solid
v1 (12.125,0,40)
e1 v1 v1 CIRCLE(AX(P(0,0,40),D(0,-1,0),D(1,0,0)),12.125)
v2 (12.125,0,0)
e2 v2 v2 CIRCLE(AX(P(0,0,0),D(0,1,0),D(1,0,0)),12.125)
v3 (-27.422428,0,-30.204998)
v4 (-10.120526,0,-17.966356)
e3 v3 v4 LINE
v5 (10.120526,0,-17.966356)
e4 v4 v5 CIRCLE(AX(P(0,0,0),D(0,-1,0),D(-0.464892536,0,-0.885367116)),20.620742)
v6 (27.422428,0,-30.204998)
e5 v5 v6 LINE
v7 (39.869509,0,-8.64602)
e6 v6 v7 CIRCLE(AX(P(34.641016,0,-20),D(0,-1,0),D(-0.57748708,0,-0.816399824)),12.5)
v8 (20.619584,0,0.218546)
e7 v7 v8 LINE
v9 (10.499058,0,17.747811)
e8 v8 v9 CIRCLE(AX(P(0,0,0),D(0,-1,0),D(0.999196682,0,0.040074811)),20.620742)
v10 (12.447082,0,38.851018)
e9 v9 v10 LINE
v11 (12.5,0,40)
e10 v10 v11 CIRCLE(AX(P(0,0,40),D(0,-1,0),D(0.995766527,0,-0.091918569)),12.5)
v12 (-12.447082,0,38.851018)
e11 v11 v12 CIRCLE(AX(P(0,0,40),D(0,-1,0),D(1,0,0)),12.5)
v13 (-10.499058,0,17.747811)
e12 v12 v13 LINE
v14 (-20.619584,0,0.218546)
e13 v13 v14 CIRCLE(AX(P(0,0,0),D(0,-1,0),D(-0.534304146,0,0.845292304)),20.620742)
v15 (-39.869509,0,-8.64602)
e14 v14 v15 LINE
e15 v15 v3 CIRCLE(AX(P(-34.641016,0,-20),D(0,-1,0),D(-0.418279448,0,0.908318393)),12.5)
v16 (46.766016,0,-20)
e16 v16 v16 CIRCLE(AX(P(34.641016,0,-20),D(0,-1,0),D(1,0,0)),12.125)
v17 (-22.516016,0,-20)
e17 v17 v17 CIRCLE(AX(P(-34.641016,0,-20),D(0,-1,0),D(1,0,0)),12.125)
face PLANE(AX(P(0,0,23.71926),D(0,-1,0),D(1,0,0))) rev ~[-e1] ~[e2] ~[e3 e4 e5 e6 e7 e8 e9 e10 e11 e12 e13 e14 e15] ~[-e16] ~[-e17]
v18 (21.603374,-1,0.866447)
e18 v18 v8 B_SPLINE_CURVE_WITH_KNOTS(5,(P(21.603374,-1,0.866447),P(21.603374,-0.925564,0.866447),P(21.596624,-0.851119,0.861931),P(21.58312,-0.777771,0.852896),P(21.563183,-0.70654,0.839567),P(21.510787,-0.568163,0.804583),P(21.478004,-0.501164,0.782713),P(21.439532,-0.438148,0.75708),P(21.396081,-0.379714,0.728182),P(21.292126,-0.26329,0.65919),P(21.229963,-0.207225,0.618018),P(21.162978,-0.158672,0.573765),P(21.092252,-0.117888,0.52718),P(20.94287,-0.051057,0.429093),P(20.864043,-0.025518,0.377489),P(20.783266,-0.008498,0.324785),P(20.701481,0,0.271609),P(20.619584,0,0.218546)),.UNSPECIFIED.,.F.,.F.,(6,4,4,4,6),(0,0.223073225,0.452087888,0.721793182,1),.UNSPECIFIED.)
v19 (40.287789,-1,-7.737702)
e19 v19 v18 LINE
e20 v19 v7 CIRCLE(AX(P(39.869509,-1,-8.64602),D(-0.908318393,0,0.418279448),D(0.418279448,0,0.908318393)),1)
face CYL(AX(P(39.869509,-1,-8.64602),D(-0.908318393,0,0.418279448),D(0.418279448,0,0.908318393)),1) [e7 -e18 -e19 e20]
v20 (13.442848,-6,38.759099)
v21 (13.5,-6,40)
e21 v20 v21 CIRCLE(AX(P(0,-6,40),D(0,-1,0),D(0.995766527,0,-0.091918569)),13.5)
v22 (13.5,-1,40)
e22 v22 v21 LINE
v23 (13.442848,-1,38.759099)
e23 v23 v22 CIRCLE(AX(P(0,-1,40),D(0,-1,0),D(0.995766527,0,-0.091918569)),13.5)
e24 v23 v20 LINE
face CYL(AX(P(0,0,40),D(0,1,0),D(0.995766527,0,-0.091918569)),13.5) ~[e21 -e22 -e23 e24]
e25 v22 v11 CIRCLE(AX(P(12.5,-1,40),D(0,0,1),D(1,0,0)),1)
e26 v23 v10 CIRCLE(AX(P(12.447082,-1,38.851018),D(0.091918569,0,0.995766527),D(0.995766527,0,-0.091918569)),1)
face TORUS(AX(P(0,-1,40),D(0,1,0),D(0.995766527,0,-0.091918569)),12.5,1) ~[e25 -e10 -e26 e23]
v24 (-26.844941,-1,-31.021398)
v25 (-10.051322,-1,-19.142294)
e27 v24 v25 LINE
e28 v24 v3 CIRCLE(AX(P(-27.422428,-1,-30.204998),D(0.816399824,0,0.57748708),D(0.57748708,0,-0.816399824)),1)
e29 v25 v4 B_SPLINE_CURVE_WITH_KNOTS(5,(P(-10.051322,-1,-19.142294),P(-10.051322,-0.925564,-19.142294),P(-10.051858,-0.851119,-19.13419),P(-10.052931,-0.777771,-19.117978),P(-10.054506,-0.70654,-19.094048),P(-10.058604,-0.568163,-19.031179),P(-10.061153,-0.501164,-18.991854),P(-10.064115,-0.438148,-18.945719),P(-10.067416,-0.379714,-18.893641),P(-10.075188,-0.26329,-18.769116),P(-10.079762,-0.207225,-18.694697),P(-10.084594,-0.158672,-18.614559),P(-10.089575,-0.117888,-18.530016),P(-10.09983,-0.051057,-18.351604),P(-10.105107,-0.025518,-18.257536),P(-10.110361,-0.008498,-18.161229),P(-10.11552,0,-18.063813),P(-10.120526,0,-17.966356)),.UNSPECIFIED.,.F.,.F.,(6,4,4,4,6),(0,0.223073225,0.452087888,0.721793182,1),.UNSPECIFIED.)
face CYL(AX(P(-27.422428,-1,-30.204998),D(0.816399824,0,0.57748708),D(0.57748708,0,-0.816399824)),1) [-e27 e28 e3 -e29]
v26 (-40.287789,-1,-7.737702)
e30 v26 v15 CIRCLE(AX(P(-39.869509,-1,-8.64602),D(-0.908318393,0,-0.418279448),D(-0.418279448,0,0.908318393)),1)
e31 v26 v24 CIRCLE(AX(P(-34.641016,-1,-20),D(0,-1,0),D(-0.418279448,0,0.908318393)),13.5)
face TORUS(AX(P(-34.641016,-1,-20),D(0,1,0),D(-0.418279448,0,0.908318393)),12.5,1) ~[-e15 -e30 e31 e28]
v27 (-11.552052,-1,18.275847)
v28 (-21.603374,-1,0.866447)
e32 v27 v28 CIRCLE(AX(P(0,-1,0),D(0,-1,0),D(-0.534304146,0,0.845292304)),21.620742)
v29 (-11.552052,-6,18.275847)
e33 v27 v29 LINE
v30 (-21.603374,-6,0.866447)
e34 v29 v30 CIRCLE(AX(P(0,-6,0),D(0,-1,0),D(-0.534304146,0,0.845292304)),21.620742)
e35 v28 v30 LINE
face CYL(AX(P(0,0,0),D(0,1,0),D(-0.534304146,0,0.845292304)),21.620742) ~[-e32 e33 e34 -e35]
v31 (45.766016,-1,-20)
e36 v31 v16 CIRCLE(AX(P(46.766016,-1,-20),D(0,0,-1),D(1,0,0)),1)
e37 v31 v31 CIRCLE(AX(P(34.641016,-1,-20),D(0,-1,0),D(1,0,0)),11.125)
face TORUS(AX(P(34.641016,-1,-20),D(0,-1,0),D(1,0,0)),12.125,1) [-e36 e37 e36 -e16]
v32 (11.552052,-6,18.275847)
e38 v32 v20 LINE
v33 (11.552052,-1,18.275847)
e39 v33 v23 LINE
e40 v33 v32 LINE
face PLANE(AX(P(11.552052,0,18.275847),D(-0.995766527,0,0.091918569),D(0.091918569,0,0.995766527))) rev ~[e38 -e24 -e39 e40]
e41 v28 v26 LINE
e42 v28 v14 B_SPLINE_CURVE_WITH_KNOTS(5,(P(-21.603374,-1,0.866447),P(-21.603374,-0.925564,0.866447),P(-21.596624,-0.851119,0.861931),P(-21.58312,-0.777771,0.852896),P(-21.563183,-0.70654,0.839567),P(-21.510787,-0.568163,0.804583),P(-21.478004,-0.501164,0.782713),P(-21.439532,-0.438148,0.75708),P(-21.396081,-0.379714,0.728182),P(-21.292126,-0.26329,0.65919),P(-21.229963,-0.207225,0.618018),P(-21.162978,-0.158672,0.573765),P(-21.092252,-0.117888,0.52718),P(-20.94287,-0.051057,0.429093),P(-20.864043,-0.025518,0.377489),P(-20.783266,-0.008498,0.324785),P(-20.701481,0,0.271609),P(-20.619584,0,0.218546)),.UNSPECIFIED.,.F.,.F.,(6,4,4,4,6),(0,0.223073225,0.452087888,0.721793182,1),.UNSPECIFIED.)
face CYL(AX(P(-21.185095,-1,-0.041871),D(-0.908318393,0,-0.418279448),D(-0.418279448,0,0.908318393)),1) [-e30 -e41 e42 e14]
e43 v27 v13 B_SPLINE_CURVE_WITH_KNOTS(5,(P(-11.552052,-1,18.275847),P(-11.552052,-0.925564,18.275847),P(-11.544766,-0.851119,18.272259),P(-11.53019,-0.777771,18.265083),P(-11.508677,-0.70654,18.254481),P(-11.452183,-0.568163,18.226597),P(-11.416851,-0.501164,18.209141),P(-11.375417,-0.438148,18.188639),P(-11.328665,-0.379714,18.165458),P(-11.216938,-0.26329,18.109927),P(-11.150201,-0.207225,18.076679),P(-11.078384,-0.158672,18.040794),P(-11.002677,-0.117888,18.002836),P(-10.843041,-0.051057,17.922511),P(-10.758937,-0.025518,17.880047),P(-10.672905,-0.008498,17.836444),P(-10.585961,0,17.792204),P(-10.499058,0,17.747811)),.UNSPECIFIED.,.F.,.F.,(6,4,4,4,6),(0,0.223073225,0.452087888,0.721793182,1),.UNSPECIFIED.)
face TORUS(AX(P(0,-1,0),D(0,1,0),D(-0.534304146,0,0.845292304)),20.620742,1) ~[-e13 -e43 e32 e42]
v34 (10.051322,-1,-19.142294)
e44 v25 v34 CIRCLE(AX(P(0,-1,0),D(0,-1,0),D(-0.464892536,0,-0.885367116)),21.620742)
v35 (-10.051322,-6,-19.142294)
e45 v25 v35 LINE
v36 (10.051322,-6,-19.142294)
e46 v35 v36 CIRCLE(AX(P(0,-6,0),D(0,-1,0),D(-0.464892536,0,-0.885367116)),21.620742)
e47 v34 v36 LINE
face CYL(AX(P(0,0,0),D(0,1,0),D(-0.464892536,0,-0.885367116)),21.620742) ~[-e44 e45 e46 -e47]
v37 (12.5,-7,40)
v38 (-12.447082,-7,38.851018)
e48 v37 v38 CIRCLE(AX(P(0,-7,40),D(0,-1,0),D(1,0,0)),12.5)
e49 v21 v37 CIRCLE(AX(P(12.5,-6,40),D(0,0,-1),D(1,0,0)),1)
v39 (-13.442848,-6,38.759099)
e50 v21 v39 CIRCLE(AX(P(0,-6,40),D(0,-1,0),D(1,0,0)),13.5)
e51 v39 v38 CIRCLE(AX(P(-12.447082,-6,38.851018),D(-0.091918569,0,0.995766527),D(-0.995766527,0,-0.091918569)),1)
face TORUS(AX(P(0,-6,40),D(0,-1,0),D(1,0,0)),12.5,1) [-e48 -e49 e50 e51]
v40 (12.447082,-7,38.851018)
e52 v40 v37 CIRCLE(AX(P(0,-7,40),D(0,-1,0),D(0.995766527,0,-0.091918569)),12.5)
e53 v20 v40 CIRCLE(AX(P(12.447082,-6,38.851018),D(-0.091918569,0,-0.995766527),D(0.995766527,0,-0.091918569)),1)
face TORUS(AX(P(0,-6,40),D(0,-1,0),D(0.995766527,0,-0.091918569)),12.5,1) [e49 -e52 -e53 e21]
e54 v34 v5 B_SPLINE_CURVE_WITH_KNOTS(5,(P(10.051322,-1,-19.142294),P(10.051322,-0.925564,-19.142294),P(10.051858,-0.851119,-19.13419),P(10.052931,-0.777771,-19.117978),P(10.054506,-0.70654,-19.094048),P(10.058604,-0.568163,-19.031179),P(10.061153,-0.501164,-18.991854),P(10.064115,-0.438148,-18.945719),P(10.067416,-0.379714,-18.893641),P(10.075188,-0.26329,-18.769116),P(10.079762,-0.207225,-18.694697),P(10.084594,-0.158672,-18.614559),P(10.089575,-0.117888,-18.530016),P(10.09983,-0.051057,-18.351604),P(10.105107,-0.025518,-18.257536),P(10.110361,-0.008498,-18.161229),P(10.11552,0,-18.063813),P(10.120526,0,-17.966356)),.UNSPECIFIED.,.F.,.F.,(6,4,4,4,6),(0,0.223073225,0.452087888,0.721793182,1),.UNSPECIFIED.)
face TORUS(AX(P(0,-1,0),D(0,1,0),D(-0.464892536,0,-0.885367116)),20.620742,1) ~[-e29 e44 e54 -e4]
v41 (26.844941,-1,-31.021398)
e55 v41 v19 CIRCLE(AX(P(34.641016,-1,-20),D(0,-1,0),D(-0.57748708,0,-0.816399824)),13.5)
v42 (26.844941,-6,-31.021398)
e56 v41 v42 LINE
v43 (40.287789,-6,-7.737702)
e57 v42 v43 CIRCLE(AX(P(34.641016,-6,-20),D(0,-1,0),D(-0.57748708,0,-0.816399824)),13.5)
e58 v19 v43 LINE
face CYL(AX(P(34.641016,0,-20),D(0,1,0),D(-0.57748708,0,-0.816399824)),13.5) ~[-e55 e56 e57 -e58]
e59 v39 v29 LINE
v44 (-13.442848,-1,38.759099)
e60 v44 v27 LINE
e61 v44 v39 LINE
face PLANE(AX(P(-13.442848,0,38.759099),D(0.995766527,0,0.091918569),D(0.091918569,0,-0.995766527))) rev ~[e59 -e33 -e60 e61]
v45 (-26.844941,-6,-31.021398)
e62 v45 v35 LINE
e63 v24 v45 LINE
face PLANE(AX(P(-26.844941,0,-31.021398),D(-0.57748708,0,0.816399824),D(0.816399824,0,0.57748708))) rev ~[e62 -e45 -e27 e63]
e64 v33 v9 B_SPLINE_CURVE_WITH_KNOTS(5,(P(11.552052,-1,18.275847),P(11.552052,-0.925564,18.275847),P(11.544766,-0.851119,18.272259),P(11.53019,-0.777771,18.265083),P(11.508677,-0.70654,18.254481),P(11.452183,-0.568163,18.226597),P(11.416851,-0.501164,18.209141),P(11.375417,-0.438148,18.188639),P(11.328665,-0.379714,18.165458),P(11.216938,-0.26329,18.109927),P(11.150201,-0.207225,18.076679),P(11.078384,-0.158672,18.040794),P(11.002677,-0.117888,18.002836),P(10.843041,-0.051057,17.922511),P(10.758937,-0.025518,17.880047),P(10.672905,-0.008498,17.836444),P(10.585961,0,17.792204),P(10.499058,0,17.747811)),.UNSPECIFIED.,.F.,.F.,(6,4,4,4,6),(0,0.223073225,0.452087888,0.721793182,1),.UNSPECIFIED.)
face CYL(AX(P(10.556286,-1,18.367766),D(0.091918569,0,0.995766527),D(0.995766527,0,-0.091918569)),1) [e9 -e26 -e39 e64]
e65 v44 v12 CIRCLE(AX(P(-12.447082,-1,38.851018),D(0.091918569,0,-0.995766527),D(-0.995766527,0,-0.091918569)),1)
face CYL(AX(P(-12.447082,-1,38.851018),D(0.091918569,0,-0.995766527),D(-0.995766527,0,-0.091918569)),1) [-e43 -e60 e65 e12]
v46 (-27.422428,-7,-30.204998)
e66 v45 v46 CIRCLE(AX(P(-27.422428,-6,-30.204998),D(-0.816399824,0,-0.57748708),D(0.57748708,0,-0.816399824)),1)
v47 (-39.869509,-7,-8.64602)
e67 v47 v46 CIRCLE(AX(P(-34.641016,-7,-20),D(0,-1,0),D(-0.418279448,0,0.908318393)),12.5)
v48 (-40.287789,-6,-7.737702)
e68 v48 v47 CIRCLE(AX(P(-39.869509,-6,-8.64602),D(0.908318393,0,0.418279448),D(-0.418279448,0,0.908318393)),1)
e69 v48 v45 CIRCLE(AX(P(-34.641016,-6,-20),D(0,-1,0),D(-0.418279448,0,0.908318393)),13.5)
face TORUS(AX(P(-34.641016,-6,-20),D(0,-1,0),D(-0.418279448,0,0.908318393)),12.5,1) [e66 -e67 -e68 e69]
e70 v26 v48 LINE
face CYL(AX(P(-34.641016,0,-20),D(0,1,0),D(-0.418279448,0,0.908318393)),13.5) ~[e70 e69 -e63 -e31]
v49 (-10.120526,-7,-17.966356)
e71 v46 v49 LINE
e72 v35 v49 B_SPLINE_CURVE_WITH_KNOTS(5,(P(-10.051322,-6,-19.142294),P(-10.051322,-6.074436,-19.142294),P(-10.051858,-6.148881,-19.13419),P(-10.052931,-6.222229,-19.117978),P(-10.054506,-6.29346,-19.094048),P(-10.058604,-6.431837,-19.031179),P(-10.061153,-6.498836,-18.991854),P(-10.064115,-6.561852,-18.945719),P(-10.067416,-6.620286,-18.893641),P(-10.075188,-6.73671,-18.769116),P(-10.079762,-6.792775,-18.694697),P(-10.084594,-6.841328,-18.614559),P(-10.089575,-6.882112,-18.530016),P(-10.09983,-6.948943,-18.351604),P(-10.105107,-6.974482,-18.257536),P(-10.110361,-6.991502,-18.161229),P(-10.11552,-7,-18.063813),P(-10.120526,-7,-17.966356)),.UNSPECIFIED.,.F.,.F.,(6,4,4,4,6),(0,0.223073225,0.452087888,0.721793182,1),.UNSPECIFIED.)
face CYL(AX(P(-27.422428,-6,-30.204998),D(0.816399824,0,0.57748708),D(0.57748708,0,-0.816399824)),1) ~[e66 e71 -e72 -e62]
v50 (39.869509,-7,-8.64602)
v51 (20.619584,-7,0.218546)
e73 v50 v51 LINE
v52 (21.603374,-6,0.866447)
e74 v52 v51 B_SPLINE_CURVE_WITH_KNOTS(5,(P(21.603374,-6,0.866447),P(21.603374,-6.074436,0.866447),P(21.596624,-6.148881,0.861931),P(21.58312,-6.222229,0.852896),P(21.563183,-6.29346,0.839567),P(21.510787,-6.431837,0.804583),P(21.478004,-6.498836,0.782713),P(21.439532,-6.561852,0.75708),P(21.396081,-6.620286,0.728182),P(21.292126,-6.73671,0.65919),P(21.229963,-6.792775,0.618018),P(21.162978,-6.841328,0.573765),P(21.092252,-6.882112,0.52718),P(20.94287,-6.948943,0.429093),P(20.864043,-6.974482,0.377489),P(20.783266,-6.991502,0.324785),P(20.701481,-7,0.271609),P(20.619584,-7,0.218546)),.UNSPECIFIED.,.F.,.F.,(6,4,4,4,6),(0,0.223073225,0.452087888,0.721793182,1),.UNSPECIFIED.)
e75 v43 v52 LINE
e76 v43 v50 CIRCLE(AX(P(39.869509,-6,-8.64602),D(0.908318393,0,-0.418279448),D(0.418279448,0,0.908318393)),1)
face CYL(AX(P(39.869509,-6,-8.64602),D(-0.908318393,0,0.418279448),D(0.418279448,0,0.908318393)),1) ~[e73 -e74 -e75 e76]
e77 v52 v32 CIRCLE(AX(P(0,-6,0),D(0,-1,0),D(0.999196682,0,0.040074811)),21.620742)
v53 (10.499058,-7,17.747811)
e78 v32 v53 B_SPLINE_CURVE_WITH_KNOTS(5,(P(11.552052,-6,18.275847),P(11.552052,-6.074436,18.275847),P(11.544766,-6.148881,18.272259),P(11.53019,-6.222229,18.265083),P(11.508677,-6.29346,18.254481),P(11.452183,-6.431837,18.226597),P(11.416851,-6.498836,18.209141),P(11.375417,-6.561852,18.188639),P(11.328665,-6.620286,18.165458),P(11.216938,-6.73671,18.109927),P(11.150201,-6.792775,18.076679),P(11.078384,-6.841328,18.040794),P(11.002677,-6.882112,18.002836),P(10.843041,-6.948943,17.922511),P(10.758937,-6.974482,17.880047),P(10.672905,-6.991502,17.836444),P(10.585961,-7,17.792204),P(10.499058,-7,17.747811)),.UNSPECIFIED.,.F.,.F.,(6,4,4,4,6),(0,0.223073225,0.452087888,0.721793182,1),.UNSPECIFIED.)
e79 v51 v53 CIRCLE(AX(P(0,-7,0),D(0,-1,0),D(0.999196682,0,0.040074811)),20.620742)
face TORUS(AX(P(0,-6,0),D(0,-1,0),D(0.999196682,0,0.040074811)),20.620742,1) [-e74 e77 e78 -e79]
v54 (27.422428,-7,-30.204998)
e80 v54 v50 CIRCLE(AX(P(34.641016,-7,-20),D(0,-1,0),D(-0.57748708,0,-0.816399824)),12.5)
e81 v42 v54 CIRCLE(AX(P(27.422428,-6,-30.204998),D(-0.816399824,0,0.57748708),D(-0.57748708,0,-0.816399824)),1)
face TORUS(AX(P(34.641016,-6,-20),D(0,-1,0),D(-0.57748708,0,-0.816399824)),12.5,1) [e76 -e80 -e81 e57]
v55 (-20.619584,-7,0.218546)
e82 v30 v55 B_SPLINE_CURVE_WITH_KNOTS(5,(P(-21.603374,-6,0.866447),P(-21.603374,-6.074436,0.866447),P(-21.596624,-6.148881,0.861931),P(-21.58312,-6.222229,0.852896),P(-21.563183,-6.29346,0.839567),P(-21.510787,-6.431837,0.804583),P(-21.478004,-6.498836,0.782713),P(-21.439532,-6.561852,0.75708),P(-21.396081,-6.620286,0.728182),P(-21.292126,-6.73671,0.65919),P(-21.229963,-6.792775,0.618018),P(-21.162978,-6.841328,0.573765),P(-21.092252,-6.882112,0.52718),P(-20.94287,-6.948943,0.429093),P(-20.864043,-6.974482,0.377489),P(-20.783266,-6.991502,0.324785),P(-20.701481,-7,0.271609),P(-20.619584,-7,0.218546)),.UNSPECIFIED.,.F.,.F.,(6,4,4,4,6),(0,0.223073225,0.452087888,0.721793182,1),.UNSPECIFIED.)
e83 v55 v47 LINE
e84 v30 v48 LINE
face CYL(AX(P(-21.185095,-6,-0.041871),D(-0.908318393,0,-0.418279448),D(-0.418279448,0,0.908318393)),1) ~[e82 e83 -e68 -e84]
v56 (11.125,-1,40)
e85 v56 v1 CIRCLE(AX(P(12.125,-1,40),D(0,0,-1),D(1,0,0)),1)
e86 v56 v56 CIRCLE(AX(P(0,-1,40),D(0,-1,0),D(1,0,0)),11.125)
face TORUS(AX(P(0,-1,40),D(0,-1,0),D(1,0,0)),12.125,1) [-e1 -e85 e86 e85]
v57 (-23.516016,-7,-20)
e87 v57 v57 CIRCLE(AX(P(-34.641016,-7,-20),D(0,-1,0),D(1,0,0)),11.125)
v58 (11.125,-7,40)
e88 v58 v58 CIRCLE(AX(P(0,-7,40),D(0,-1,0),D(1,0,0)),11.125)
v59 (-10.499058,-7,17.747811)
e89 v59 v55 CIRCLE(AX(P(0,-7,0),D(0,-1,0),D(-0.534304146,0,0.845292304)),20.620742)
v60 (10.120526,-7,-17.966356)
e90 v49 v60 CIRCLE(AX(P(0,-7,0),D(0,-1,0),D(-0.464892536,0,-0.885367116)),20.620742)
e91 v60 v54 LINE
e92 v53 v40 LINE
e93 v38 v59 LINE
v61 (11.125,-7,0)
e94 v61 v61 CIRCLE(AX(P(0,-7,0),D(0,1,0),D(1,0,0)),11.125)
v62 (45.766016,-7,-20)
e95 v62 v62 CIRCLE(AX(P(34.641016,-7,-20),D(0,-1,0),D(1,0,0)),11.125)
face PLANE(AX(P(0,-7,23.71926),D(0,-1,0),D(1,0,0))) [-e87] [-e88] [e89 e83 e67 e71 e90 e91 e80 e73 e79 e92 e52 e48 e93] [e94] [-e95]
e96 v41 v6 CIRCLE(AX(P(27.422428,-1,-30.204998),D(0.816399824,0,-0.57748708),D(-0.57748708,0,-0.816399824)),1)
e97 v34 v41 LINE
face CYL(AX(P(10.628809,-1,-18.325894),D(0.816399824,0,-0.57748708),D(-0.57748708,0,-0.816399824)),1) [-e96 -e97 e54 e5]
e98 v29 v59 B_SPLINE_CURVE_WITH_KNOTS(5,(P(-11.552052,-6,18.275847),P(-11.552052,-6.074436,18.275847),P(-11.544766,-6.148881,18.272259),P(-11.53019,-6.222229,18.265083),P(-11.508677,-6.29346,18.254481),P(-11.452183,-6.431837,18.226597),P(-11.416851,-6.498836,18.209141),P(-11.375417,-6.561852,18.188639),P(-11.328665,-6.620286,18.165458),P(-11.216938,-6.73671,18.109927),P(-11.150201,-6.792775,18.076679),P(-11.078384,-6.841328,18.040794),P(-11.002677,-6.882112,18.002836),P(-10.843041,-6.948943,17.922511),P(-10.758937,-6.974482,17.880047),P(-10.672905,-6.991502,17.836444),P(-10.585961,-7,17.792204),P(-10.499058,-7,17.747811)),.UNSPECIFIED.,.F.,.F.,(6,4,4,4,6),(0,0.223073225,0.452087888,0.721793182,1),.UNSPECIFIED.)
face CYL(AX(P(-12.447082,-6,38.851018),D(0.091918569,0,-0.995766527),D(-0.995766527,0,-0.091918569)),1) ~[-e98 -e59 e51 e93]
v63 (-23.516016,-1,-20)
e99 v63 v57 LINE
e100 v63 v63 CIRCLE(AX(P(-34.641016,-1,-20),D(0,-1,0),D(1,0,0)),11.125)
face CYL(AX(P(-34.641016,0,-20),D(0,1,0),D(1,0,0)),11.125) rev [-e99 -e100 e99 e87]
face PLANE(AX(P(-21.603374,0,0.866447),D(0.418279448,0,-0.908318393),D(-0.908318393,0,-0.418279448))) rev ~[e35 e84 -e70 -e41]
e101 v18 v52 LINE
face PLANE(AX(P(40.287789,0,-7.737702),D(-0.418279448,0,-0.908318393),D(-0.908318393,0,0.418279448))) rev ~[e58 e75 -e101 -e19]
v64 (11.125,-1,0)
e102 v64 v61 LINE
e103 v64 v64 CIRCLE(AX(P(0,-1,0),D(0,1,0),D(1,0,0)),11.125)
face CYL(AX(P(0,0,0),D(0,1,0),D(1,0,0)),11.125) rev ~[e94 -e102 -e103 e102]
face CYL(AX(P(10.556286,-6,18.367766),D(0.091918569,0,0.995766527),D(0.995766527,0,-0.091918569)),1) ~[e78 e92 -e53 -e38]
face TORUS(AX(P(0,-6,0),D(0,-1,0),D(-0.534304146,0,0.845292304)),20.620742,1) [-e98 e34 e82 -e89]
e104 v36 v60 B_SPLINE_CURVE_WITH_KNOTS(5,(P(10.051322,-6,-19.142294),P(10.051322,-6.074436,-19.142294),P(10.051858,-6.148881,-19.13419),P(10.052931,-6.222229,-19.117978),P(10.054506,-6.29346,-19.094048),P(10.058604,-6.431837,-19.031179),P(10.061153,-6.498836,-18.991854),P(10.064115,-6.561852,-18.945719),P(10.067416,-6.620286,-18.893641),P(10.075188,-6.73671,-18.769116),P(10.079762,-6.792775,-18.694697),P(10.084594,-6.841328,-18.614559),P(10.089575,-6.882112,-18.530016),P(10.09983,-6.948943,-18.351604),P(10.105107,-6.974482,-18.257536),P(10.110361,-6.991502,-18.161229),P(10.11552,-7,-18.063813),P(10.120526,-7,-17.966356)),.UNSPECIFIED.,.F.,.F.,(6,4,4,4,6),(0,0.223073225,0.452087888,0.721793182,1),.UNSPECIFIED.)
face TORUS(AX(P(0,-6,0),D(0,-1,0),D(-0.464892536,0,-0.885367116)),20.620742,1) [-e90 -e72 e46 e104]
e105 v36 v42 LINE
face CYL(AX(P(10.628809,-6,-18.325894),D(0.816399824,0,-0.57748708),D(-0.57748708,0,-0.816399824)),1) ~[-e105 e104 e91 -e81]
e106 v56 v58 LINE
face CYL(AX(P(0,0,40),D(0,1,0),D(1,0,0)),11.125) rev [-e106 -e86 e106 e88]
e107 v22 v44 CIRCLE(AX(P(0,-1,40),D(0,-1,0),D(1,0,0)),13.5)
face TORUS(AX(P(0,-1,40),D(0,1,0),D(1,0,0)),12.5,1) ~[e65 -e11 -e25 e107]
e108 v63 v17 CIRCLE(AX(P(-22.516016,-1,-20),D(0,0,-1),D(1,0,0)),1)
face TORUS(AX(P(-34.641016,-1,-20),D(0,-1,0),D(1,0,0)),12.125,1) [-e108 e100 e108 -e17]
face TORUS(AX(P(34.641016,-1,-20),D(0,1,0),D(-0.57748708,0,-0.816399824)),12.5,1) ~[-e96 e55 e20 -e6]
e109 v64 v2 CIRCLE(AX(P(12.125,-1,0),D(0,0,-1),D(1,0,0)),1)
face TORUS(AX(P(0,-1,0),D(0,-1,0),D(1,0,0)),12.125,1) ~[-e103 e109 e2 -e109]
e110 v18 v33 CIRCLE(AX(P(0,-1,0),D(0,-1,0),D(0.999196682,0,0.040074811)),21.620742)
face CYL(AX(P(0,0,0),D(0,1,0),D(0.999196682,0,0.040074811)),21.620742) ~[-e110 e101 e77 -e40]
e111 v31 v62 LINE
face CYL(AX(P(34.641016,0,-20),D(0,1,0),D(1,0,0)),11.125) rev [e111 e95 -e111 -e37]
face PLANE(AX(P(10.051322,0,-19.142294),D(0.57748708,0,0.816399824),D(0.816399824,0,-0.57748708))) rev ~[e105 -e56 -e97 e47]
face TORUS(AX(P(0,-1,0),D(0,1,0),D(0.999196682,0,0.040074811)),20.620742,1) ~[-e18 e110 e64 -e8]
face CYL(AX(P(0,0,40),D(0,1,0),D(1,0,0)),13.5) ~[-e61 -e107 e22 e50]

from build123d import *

# Parameters (mm, degrees)
F0_R     = 11.125
F1_DEPTH = 7
F2_R     = 1


# Not quite as in the source:
# - a feature names something its author has since deleted; it is built from what else it names


with BuildPart() as f1:
    # F0 (on Front) → F1 (new body)
    with BuildSketch(Plane.XZ):
        with BuildLine():
            ThreePointArc((0, 16.5), (6.7082039325, 14.2177978871), (10.632866558, 8.3181818182))
            Line((10.632866558, 8.3181818182), (11.5520522489, 18.27584709))
            Line((11.5520522489, 18.27584709), (13.442848117, 38.7590993172))
            ThreePointArc((13.442848117, 38.7590993172), (0, 26.5), (-13.442848117, 38.7590993172))
            Line((-13.442848117, 38.7590993172), (-11.5520522489, 18.27584709))
            Line((-11.5520522489, 18.27584709), (-10.632866558, 8.3181818182))
            ThreePointArc((-10.632866558, 8.3181818182), (-6.7082039325, 14.2177978871), (0, 16.5))
        make_face()
        with BuildLine():
            ThreePointArc((-1.8873234889, -13.3674234633), (-14.2894191624, -8.25), (-12.5201900468, 5.0492416452))
            Line((-12.5201900468, 5.0492416452), (-21.6033739801, 0.8664471684))
            Line((-21.6033739801, 0.8664471684), (-40.287788695, -7.7377016901))
            ThreePointArc((-40.287788695, -7.7377016901), (-27.3602685709, -8.6315913748), (-21.1410161514, -20))
            ThreePointArc((-21.1410161514, -20), (-22.6514994755, -26.2049568798), (-26.844940578, -31.0213976271))
            Line((-26.844940578, -31.0213976271), (-10.0513217312, -19.1422942584))
            Line((-10.0513217312, -19.1422942584), (-1.8873234889, -13.3674234633))
        make_face()
        with BuildLine():
            ThreePointArc((1.8873234889, -13.3674234633), (14.2894191624, -8.25), (12.5201900468, 5.0492416452))
            ThreePointArc((12.5201900468, 5.0492416452), (13.2527839647, 2.5717148333), (13.5, 0))
            ThreePointArc((13.5, 0), (10.1913901677, -8.8535623593), (1.8873234889, -13.3674234633))
        make_face()
        with BuildLine():
            ThreePointArc((-1.8873234889, -13.3674234633), (-11.6913429511, -6.75), (-12.5201900468, 5.0492416452))
            ThreePointArc((-12.5201900468, 5.0492416452), (-14.2894191624, -8.25), (-1.8873234889, -13.3674234633))
        make_face()
        with BuildLine():
            Line((0, 16.5), (0, 13.5))
            ThreePointArc((0, 13.5), (5.9141586661, 12.1355975243), (10.632866558, 8.3181818182))
            ThreePointArc((10.632866558, 8.3181818182), (6.7082039325, 14.2177978871), (0, 16.5))
        make_face()
        with BuildLine():
            Line((21.6033739801, 0.8664471684), (12.5201900468, 5.0492416452))
            ThreePointArc((12.5201900468, 5.0492416452), (14.2894191624, -8.25), (1.8873234889, -13.3674234633))
            Line((1.8873234889, -13.3674234633), (10.0513217312, -19.1422942584))
            Line((10.0513217312, -19.1422942584), (26.844940578, -31.0213976271))
            ThreePointArc((26.844940578, -31.0213976271), (22.9496732003, -13.25), (40.287788695, -7.7377016901))
            Line((40.287788695, -7.7377016901), (21.6033739801, 0.8664471684))
        make_face()
        with BuildLine():
            ThreePointArc((-10.632866558, 8.3181818182), (-5.9141586661, 12.1355975243), (0, 13.5))
            Line((0, 13.5), (0, 16.5))
            ThreePointArc((0, 16.5), (-6.7082039325, 14.2177978871), (-10.632866558, 8.3181818182))
        make_face()
        with BuildLine():
            ThreePointArc((-13.442848117, 38.7590993172), (0, 26.5), (13.442848117, 38.7590993172))
            ThreePointArc((13.442848117, 38.7590993172), (13.4857044603, 39.3788919494), (13.5, 40))
            ThreePointArc((13.5, 40), (-0.6211080506, 53.4857044603), (-13.442848117, 38.7590993172))
        make_face()
        with Locations((0, 40)):
            Circle(F0_R, mode=Mode.SUBTRACT)
        with BuildLine():
            ThreePointArc((10.632866558, 8.3181818182), (5.9141586661, 12.1355975243), (0, 13.5))
            ThreePointArc((0, 13.5), (-5.9141586661, 12.1355975243), (-10.632866558, 8.3181818182))
            ThreePointArc((-10.632866558, 8.3181818182), (-11.6913429511, 6.75), (-12.5201900468, 5.0492416452))
            ThreePointArc((-12.5201900468, 5.0492416452), (-11.6913429511, -6.75), (-1.8873234889, -13.3674234633))
            ThreePointArc((-1.8873234889, -13.3674234633), (0, -13.5), (1.8873234889, -13.3674234633))
            ThreePointArc((1.8873234889, -13.3674234633), (10.1913901677, -8.8535623593), (13.5, 0))
            ThreePointArc((13.5, 0), (13.2527839647, 2.5717148333), (12.5201900468, 5.0492416452))
            ThreePointArc((12.5201900468, 5.0492416452), (11.6913429511, 6.75), (10.632866558, 8.3181818182))
        make_face()
        with BuildLine():
            ThreePointArc((0, 11.125), (7.8665629407, 7.8665629407), (11.125, 0))
            ThreePointArc((11.125, 0), (-7.8665629407, -7.8665629407), (0, 11.125))
        make_face(mode=Mode.SUBTRACT)
        with BuildLine():
            ThreePointArc((-21.1410161514, -20), (-27.3602685709, -8.6315913748), (-40.287788695, -7.7377016901))
            ThreePointArc((-40.287788695, -7.7377016901), (-46.3323591025, -26.75), (-26.844940578, -31.0213976271))
            ThreePointArc((-26.844940578, -31.0213976271), (-22.6514994755, -26.2049568798), (-21.1410161514, -20))
        make_face()
        with Locations((-34.6410161514, -20)):
            Circle(F0_R, mode=Mode.SUBTRACT)
        with BuildLine():
            ThreePointArc((48.1410161514, -20), (46.0094247766, -12.7192524195), (40.287788695, -7.7377016901))
            ThreePointArc((40.287788695, -7.7377016901), (22.9496732003, -13.25), (26.844940578, -31.0213976271))
            ThreePointArc((26.844940578, -31.0213976271), (40.8459730312, -31.9895166758), (48.1410161514, -20))
        make_face()
        with Locations((34.6410161514, -20)):
            Circle(F0_R, mode=Mode.SUBTRACT)
        with BuildLine():
            ThreePointArc((-12.5201900468, 5.0492416452), (-11.6913429511, 6.75), (-10.632866558, 8.3181818182))
            Line((-10.632866558, 8.3181818182), (-11.5520522489, 18.27584709))
            ThreePointArc((-11.5520522489, 18.27584709), (-18.7241120888, 10.8103711548), (-21.6033739801, 0.8664471684))
            Line((-21.6033739801, 0.8664471684), (-12.5201900468, 5.0492416452))
        make_face()
        with BuildLine():
            Line((11.5520522489, 18.27584709), (10.632866558, 8.3181818182))
            ThreePointArc((10.632866558, 8.3181818182), (11.6913429511, 6.75), (12.5201900468, 5.0492416452))
            Line((12.5201900468, 5.0492416452), (21.6033739801, 0.8664471684))
            ThreePointArc((21.6033739801, 0.8664471684), (18.7241120888, 10.8103711548), (11.5520522489, 18.27584709))
        make_face()
        with BuildLine():
            Line((10.0513217312, -19.1422942584), (1.8873234889, -13.3674234633))
            ThreePointArc((1.8873234889, -13.3674234633), (0, -13.5), (-1.8873234889, -13.3674234633))
            Line((-1.8873234889, -13.3674234633), (-10.0513217312, -19.1422942584))
            ThreePointArc((-10.0513217312, -19.1422942584), (0, -21.6207423096), (10.0513217312, -19.1422942584))
        make_face()
    extrude(amount=F1_DEPTH)

    # F2
    f2_edges = [f1.edges().sort_by_distance(p)[0] for p in [
        (12.49745, -7, 28.517473),
        (-30.945581, -7, -3.435627),
        (18.448131, -7, -25.081846),
        (-18.448131, 0, -25.081846),
        (-12.49745, 0, 28.517473),
        (-18.724112, 0, 10.810371),
        (-30.945581, 0, -3.435627),
        (-46.332359, 0, -26.75),
        (0, 0, -21.620742),
        (18.448131, 0, -25.081846),
        (46.332359, 0, -26.75),
        (30.945581, 0, -3.435627),
        (18.724112, 0, 10.810371),
        (12.49745, 0, 28.517473),
        (0, 0, 53.5),
        (-11.125, 0, 40),
        (-11.125, 0, 0),
        (-45.766016, 0, -20),
        (23.516016, 0, -20),
        (18.724112, -7, 10.810371),
        (0, -7, -21.620742),
        (-18.724112, -7, 10.810371),
    ]]
    fillet(f2_edges, radius=F2_R)


solid = f1.part
